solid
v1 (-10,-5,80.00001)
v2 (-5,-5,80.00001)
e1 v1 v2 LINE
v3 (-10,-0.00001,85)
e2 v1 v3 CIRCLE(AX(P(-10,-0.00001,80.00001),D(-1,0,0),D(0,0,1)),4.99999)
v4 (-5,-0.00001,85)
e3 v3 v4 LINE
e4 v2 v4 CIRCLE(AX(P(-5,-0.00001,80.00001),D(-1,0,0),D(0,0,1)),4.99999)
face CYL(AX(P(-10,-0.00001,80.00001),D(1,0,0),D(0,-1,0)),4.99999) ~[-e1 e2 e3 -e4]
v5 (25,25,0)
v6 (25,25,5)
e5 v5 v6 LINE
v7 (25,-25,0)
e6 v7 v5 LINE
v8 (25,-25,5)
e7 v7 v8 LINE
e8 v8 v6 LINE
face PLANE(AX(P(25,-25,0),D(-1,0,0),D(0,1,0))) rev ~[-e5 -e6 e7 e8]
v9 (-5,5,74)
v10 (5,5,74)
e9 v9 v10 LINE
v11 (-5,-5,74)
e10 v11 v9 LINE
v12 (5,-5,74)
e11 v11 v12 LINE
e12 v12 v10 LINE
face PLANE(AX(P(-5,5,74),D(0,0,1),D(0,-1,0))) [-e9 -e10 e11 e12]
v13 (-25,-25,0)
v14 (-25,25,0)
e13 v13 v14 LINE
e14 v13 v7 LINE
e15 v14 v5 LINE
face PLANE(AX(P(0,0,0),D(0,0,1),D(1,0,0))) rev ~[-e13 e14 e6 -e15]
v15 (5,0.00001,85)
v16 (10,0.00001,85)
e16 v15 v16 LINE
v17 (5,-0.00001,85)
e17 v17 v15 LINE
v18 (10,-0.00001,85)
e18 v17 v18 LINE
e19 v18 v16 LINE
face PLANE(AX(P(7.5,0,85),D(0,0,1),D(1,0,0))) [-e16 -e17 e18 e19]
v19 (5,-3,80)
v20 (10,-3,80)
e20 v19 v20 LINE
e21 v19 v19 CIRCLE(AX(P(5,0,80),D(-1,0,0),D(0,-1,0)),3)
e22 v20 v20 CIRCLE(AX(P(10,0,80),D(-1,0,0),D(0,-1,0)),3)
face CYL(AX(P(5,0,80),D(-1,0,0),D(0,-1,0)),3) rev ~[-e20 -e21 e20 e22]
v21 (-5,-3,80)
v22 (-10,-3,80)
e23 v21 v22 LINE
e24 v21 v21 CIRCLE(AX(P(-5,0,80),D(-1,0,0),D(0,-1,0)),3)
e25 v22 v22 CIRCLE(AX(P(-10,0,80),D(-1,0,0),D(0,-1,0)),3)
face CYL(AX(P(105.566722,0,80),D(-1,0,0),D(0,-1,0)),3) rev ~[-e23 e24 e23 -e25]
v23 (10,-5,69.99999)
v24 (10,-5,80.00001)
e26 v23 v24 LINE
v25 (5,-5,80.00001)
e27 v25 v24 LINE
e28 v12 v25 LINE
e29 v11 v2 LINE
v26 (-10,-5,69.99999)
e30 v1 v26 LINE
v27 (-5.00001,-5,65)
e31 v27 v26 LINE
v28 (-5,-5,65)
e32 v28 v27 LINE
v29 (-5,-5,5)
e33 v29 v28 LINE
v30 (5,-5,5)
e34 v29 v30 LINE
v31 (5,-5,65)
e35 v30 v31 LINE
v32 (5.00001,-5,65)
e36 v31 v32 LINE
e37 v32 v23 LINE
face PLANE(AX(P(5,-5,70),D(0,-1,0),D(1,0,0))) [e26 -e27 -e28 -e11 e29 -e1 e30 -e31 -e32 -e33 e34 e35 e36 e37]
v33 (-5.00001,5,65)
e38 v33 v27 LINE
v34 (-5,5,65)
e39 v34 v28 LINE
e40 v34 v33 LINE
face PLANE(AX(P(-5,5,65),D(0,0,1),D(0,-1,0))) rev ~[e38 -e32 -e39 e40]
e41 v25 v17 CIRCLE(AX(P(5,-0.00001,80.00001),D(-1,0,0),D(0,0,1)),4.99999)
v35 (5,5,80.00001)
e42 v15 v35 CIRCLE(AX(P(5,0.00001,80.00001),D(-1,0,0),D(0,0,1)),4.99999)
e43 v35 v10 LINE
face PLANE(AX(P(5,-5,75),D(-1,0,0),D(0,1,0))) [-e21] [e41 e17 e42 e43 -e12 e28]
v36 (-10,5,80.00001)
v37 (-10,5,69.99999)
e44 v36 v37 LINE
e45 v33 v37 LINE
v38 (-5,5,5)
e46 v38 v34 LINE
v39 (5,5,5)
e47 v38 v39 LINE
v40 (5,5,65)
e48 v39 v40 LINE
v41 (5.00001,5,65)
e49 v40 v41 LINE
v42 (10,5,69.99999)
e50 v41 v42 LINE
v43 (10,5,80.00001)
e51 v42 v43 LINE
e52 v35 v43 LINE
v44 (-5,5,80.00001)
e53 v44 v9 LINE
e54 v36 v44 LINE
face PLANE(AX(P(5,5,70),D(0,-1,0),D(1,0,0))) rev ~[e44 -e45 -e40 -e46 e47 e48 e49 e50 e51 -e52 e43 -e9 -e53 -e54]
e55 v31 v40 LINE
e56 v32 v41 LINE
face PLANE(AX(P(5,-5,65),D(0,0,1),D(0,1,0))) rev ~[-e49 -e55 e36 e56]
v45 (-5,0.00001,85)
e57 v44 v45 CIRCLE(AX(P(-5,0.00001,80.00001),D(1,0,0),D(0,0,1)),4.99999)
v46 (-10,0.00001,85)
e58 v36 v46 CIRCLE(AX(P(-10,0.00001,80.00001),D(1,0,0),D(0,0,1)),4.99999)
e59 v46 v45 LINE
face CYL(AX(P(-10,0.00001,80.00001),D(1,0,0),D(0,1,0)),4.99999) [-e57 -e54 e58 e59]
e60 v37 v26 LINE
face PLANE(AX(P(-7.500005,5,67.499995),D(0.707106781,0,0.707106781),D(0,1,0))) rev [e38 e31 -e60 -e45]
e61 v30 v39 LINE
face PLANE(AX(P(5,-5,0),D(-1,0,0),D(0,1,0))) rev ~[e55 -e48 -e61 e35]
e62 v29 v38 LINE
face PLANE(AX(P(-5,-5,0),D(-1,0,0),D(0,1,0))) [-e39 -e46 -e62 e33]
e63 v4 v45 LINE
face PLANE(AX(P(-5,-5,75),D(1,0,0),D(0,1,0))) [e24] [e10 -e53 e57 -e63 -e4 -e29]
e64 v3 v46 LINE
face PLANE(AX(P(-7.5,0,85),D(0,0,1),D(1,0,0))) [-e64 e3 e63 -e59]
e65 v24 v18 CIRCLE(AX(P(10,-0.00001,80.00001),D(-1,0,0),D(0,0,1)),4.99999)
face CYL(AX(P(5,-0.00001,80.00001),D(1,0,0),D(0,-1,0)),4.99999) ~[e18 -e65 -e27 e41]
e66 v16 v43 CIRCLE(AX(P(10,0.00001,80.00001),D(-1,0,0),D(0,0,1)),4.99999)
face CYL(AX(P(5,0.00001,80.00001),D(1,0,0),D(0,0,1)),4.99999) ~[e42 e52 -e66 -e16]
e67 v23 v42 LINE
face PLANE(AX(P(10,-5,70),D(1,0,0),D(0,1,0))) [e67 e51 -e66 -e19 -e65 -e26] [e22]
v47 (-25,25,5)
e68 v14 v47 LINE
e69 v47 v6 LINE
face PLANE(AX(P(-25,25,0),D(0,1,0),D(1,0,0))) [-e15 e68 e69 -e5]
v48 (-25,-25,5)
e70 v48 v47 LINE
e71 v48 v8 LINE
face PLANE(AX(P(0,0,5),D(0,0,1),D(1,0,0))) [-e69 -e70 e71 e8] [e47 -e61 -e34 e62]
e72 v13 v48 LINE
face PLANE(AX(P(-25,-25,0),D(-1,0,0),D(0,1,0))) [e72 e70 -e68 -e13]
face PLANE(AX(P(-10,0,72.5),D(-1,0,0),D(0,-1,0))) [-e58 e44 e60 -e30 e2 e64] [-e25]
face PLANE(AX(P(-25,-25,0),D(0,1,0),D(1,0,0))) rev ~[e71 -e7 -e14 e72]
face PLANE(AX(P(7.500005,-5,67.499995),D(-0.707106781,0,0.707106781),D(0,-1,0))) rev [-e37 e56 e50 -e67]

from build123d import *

# Parameters (mm, degrees)
F0_W      = 50
F0_H      = 50
F0_W_2    = 10
F0_H_2    = 10
F1_DEPTH  = 5
F2_DEPTH  = 75
F3_W      = 10
F3_H      = 5
F4_DEPTH  = 5
F5_W      = 10
F5_H      = 5
F6_DEPTH  = 5
F7_W      = 5
F7_H      = 10
F8_DEPTH  = 10
F10_D     = 6
F10_DEPTH = 20.001
F12_D     = 6
F13_R     = 4.99999
F14_DEPTH = 1
F15_DEPTH = 5
F16_SIZE  = 4.99999


# Not quite as in the source:
# - a fillet or chamfer is up to 0.001 mm smaller than in the source, because OpenCascade refuses the exact size


with BuildPart() as f1:
    # F0 (on Top) → F1 (new body)
    with BuildSketch(Plane.XY):
        Rectangle(F0_W, F0_H)
        Rectangle(F0_W_2, F0_H_2, mode=Mode.SUBTRACT)
    extrude(amount=F1_DEPTH)

    # F0 (on Top) → F2 (join)
    with BuildSketch(Plane.XY):
        Rectangle(F0_W_2, F0_H_2)
    extrude(amount=F2_DEPTH)

    # F3 (on face) → F4 (join)
    with BuildSketch(Plane.YZ.offset(5)):
        with Locations((0, 72.5)):
            Rectangle(F3_W, F3_H)
    extrude(amount=F4_DEPTH)

    # F5 (on face) → F6 (join)
    with BuildSketch(Plane(origin=(-5, 0, 0), x_dir=(0, -1, 0), z_dir=(-1, 0, 0))):
        with Locations((0, 72.5)):
            Rectangle(F5_W, F5_H)
    extrude(amount=F6_DEPTH)

    # F7 (on face) → F8 (join)
    with BuildSketch(Plane.XY.offset(75)):
        with Locations((7.5, 0)):
            Rectangle(F7_W, F7_H)
        with Locations((-7.5, 0)):
            Rectangle(F7_W, F7_H)
    extrude(amount=F8_DEPTH)

    # F10 (through all, one way)
    with BuildSketch(Plane(origin=(5, 0, 0), x_dir=(0, -1, 0), z_dir=(-1, 0, 0))):
        with Locations((0, 80)):
            Circle(F10_D / 2)
    extrude(amount=-F10_DEPTH, mode=Mode.SUBTRACT)

    # F12 (through all)
    with Locations(Plane.YZ.offset(-5)):
        with Locations((0, 80)):
            Hole(F12_D / 2)

    # F13 (radius 5 in the source; OpenCascade refuses exactly that, so slightly less here)
    f13_edges = [f1.edges().sort_by_distance(p)[0] for p in [
        (-7.5, -5, 85),
        (7.5, -5, 85),
        (7.5, 5, 85),
        (-7.5, 5, 85),
    ]]
    fillet(f13_edges, radius=F13_R)

    # F14 (cut): a face of the model
    f14_faces = [f1.faces().sort_by_distance(p)[0] for p in [
        (0, 0, 75),
    ]]
    extrude(f14_faces, amount=-F14_DEPTH, mode=Mode.SUBTRACT)

    # F15 (add): faces of the model
    f15_faces = [f1.faces().sort_by_distance(p)[0] for p in [
        (7.5, 0, 70),
        (-7.5, 0, 70),
    ]]
    extrude(f15_faces, amount=F15_DEPTH)

    # F16 (size 5 in the source; OpenCascade refuses exactly that, so slightly less here)
    f16_edges = [f1.edges().sort_by_distance(p)[0] for p in [
        (10, 0, 65),
        (-10, 0, 65),
    ]]
    chamfer(f16_edges, length=F16_SIZE)


solid = f1.part
